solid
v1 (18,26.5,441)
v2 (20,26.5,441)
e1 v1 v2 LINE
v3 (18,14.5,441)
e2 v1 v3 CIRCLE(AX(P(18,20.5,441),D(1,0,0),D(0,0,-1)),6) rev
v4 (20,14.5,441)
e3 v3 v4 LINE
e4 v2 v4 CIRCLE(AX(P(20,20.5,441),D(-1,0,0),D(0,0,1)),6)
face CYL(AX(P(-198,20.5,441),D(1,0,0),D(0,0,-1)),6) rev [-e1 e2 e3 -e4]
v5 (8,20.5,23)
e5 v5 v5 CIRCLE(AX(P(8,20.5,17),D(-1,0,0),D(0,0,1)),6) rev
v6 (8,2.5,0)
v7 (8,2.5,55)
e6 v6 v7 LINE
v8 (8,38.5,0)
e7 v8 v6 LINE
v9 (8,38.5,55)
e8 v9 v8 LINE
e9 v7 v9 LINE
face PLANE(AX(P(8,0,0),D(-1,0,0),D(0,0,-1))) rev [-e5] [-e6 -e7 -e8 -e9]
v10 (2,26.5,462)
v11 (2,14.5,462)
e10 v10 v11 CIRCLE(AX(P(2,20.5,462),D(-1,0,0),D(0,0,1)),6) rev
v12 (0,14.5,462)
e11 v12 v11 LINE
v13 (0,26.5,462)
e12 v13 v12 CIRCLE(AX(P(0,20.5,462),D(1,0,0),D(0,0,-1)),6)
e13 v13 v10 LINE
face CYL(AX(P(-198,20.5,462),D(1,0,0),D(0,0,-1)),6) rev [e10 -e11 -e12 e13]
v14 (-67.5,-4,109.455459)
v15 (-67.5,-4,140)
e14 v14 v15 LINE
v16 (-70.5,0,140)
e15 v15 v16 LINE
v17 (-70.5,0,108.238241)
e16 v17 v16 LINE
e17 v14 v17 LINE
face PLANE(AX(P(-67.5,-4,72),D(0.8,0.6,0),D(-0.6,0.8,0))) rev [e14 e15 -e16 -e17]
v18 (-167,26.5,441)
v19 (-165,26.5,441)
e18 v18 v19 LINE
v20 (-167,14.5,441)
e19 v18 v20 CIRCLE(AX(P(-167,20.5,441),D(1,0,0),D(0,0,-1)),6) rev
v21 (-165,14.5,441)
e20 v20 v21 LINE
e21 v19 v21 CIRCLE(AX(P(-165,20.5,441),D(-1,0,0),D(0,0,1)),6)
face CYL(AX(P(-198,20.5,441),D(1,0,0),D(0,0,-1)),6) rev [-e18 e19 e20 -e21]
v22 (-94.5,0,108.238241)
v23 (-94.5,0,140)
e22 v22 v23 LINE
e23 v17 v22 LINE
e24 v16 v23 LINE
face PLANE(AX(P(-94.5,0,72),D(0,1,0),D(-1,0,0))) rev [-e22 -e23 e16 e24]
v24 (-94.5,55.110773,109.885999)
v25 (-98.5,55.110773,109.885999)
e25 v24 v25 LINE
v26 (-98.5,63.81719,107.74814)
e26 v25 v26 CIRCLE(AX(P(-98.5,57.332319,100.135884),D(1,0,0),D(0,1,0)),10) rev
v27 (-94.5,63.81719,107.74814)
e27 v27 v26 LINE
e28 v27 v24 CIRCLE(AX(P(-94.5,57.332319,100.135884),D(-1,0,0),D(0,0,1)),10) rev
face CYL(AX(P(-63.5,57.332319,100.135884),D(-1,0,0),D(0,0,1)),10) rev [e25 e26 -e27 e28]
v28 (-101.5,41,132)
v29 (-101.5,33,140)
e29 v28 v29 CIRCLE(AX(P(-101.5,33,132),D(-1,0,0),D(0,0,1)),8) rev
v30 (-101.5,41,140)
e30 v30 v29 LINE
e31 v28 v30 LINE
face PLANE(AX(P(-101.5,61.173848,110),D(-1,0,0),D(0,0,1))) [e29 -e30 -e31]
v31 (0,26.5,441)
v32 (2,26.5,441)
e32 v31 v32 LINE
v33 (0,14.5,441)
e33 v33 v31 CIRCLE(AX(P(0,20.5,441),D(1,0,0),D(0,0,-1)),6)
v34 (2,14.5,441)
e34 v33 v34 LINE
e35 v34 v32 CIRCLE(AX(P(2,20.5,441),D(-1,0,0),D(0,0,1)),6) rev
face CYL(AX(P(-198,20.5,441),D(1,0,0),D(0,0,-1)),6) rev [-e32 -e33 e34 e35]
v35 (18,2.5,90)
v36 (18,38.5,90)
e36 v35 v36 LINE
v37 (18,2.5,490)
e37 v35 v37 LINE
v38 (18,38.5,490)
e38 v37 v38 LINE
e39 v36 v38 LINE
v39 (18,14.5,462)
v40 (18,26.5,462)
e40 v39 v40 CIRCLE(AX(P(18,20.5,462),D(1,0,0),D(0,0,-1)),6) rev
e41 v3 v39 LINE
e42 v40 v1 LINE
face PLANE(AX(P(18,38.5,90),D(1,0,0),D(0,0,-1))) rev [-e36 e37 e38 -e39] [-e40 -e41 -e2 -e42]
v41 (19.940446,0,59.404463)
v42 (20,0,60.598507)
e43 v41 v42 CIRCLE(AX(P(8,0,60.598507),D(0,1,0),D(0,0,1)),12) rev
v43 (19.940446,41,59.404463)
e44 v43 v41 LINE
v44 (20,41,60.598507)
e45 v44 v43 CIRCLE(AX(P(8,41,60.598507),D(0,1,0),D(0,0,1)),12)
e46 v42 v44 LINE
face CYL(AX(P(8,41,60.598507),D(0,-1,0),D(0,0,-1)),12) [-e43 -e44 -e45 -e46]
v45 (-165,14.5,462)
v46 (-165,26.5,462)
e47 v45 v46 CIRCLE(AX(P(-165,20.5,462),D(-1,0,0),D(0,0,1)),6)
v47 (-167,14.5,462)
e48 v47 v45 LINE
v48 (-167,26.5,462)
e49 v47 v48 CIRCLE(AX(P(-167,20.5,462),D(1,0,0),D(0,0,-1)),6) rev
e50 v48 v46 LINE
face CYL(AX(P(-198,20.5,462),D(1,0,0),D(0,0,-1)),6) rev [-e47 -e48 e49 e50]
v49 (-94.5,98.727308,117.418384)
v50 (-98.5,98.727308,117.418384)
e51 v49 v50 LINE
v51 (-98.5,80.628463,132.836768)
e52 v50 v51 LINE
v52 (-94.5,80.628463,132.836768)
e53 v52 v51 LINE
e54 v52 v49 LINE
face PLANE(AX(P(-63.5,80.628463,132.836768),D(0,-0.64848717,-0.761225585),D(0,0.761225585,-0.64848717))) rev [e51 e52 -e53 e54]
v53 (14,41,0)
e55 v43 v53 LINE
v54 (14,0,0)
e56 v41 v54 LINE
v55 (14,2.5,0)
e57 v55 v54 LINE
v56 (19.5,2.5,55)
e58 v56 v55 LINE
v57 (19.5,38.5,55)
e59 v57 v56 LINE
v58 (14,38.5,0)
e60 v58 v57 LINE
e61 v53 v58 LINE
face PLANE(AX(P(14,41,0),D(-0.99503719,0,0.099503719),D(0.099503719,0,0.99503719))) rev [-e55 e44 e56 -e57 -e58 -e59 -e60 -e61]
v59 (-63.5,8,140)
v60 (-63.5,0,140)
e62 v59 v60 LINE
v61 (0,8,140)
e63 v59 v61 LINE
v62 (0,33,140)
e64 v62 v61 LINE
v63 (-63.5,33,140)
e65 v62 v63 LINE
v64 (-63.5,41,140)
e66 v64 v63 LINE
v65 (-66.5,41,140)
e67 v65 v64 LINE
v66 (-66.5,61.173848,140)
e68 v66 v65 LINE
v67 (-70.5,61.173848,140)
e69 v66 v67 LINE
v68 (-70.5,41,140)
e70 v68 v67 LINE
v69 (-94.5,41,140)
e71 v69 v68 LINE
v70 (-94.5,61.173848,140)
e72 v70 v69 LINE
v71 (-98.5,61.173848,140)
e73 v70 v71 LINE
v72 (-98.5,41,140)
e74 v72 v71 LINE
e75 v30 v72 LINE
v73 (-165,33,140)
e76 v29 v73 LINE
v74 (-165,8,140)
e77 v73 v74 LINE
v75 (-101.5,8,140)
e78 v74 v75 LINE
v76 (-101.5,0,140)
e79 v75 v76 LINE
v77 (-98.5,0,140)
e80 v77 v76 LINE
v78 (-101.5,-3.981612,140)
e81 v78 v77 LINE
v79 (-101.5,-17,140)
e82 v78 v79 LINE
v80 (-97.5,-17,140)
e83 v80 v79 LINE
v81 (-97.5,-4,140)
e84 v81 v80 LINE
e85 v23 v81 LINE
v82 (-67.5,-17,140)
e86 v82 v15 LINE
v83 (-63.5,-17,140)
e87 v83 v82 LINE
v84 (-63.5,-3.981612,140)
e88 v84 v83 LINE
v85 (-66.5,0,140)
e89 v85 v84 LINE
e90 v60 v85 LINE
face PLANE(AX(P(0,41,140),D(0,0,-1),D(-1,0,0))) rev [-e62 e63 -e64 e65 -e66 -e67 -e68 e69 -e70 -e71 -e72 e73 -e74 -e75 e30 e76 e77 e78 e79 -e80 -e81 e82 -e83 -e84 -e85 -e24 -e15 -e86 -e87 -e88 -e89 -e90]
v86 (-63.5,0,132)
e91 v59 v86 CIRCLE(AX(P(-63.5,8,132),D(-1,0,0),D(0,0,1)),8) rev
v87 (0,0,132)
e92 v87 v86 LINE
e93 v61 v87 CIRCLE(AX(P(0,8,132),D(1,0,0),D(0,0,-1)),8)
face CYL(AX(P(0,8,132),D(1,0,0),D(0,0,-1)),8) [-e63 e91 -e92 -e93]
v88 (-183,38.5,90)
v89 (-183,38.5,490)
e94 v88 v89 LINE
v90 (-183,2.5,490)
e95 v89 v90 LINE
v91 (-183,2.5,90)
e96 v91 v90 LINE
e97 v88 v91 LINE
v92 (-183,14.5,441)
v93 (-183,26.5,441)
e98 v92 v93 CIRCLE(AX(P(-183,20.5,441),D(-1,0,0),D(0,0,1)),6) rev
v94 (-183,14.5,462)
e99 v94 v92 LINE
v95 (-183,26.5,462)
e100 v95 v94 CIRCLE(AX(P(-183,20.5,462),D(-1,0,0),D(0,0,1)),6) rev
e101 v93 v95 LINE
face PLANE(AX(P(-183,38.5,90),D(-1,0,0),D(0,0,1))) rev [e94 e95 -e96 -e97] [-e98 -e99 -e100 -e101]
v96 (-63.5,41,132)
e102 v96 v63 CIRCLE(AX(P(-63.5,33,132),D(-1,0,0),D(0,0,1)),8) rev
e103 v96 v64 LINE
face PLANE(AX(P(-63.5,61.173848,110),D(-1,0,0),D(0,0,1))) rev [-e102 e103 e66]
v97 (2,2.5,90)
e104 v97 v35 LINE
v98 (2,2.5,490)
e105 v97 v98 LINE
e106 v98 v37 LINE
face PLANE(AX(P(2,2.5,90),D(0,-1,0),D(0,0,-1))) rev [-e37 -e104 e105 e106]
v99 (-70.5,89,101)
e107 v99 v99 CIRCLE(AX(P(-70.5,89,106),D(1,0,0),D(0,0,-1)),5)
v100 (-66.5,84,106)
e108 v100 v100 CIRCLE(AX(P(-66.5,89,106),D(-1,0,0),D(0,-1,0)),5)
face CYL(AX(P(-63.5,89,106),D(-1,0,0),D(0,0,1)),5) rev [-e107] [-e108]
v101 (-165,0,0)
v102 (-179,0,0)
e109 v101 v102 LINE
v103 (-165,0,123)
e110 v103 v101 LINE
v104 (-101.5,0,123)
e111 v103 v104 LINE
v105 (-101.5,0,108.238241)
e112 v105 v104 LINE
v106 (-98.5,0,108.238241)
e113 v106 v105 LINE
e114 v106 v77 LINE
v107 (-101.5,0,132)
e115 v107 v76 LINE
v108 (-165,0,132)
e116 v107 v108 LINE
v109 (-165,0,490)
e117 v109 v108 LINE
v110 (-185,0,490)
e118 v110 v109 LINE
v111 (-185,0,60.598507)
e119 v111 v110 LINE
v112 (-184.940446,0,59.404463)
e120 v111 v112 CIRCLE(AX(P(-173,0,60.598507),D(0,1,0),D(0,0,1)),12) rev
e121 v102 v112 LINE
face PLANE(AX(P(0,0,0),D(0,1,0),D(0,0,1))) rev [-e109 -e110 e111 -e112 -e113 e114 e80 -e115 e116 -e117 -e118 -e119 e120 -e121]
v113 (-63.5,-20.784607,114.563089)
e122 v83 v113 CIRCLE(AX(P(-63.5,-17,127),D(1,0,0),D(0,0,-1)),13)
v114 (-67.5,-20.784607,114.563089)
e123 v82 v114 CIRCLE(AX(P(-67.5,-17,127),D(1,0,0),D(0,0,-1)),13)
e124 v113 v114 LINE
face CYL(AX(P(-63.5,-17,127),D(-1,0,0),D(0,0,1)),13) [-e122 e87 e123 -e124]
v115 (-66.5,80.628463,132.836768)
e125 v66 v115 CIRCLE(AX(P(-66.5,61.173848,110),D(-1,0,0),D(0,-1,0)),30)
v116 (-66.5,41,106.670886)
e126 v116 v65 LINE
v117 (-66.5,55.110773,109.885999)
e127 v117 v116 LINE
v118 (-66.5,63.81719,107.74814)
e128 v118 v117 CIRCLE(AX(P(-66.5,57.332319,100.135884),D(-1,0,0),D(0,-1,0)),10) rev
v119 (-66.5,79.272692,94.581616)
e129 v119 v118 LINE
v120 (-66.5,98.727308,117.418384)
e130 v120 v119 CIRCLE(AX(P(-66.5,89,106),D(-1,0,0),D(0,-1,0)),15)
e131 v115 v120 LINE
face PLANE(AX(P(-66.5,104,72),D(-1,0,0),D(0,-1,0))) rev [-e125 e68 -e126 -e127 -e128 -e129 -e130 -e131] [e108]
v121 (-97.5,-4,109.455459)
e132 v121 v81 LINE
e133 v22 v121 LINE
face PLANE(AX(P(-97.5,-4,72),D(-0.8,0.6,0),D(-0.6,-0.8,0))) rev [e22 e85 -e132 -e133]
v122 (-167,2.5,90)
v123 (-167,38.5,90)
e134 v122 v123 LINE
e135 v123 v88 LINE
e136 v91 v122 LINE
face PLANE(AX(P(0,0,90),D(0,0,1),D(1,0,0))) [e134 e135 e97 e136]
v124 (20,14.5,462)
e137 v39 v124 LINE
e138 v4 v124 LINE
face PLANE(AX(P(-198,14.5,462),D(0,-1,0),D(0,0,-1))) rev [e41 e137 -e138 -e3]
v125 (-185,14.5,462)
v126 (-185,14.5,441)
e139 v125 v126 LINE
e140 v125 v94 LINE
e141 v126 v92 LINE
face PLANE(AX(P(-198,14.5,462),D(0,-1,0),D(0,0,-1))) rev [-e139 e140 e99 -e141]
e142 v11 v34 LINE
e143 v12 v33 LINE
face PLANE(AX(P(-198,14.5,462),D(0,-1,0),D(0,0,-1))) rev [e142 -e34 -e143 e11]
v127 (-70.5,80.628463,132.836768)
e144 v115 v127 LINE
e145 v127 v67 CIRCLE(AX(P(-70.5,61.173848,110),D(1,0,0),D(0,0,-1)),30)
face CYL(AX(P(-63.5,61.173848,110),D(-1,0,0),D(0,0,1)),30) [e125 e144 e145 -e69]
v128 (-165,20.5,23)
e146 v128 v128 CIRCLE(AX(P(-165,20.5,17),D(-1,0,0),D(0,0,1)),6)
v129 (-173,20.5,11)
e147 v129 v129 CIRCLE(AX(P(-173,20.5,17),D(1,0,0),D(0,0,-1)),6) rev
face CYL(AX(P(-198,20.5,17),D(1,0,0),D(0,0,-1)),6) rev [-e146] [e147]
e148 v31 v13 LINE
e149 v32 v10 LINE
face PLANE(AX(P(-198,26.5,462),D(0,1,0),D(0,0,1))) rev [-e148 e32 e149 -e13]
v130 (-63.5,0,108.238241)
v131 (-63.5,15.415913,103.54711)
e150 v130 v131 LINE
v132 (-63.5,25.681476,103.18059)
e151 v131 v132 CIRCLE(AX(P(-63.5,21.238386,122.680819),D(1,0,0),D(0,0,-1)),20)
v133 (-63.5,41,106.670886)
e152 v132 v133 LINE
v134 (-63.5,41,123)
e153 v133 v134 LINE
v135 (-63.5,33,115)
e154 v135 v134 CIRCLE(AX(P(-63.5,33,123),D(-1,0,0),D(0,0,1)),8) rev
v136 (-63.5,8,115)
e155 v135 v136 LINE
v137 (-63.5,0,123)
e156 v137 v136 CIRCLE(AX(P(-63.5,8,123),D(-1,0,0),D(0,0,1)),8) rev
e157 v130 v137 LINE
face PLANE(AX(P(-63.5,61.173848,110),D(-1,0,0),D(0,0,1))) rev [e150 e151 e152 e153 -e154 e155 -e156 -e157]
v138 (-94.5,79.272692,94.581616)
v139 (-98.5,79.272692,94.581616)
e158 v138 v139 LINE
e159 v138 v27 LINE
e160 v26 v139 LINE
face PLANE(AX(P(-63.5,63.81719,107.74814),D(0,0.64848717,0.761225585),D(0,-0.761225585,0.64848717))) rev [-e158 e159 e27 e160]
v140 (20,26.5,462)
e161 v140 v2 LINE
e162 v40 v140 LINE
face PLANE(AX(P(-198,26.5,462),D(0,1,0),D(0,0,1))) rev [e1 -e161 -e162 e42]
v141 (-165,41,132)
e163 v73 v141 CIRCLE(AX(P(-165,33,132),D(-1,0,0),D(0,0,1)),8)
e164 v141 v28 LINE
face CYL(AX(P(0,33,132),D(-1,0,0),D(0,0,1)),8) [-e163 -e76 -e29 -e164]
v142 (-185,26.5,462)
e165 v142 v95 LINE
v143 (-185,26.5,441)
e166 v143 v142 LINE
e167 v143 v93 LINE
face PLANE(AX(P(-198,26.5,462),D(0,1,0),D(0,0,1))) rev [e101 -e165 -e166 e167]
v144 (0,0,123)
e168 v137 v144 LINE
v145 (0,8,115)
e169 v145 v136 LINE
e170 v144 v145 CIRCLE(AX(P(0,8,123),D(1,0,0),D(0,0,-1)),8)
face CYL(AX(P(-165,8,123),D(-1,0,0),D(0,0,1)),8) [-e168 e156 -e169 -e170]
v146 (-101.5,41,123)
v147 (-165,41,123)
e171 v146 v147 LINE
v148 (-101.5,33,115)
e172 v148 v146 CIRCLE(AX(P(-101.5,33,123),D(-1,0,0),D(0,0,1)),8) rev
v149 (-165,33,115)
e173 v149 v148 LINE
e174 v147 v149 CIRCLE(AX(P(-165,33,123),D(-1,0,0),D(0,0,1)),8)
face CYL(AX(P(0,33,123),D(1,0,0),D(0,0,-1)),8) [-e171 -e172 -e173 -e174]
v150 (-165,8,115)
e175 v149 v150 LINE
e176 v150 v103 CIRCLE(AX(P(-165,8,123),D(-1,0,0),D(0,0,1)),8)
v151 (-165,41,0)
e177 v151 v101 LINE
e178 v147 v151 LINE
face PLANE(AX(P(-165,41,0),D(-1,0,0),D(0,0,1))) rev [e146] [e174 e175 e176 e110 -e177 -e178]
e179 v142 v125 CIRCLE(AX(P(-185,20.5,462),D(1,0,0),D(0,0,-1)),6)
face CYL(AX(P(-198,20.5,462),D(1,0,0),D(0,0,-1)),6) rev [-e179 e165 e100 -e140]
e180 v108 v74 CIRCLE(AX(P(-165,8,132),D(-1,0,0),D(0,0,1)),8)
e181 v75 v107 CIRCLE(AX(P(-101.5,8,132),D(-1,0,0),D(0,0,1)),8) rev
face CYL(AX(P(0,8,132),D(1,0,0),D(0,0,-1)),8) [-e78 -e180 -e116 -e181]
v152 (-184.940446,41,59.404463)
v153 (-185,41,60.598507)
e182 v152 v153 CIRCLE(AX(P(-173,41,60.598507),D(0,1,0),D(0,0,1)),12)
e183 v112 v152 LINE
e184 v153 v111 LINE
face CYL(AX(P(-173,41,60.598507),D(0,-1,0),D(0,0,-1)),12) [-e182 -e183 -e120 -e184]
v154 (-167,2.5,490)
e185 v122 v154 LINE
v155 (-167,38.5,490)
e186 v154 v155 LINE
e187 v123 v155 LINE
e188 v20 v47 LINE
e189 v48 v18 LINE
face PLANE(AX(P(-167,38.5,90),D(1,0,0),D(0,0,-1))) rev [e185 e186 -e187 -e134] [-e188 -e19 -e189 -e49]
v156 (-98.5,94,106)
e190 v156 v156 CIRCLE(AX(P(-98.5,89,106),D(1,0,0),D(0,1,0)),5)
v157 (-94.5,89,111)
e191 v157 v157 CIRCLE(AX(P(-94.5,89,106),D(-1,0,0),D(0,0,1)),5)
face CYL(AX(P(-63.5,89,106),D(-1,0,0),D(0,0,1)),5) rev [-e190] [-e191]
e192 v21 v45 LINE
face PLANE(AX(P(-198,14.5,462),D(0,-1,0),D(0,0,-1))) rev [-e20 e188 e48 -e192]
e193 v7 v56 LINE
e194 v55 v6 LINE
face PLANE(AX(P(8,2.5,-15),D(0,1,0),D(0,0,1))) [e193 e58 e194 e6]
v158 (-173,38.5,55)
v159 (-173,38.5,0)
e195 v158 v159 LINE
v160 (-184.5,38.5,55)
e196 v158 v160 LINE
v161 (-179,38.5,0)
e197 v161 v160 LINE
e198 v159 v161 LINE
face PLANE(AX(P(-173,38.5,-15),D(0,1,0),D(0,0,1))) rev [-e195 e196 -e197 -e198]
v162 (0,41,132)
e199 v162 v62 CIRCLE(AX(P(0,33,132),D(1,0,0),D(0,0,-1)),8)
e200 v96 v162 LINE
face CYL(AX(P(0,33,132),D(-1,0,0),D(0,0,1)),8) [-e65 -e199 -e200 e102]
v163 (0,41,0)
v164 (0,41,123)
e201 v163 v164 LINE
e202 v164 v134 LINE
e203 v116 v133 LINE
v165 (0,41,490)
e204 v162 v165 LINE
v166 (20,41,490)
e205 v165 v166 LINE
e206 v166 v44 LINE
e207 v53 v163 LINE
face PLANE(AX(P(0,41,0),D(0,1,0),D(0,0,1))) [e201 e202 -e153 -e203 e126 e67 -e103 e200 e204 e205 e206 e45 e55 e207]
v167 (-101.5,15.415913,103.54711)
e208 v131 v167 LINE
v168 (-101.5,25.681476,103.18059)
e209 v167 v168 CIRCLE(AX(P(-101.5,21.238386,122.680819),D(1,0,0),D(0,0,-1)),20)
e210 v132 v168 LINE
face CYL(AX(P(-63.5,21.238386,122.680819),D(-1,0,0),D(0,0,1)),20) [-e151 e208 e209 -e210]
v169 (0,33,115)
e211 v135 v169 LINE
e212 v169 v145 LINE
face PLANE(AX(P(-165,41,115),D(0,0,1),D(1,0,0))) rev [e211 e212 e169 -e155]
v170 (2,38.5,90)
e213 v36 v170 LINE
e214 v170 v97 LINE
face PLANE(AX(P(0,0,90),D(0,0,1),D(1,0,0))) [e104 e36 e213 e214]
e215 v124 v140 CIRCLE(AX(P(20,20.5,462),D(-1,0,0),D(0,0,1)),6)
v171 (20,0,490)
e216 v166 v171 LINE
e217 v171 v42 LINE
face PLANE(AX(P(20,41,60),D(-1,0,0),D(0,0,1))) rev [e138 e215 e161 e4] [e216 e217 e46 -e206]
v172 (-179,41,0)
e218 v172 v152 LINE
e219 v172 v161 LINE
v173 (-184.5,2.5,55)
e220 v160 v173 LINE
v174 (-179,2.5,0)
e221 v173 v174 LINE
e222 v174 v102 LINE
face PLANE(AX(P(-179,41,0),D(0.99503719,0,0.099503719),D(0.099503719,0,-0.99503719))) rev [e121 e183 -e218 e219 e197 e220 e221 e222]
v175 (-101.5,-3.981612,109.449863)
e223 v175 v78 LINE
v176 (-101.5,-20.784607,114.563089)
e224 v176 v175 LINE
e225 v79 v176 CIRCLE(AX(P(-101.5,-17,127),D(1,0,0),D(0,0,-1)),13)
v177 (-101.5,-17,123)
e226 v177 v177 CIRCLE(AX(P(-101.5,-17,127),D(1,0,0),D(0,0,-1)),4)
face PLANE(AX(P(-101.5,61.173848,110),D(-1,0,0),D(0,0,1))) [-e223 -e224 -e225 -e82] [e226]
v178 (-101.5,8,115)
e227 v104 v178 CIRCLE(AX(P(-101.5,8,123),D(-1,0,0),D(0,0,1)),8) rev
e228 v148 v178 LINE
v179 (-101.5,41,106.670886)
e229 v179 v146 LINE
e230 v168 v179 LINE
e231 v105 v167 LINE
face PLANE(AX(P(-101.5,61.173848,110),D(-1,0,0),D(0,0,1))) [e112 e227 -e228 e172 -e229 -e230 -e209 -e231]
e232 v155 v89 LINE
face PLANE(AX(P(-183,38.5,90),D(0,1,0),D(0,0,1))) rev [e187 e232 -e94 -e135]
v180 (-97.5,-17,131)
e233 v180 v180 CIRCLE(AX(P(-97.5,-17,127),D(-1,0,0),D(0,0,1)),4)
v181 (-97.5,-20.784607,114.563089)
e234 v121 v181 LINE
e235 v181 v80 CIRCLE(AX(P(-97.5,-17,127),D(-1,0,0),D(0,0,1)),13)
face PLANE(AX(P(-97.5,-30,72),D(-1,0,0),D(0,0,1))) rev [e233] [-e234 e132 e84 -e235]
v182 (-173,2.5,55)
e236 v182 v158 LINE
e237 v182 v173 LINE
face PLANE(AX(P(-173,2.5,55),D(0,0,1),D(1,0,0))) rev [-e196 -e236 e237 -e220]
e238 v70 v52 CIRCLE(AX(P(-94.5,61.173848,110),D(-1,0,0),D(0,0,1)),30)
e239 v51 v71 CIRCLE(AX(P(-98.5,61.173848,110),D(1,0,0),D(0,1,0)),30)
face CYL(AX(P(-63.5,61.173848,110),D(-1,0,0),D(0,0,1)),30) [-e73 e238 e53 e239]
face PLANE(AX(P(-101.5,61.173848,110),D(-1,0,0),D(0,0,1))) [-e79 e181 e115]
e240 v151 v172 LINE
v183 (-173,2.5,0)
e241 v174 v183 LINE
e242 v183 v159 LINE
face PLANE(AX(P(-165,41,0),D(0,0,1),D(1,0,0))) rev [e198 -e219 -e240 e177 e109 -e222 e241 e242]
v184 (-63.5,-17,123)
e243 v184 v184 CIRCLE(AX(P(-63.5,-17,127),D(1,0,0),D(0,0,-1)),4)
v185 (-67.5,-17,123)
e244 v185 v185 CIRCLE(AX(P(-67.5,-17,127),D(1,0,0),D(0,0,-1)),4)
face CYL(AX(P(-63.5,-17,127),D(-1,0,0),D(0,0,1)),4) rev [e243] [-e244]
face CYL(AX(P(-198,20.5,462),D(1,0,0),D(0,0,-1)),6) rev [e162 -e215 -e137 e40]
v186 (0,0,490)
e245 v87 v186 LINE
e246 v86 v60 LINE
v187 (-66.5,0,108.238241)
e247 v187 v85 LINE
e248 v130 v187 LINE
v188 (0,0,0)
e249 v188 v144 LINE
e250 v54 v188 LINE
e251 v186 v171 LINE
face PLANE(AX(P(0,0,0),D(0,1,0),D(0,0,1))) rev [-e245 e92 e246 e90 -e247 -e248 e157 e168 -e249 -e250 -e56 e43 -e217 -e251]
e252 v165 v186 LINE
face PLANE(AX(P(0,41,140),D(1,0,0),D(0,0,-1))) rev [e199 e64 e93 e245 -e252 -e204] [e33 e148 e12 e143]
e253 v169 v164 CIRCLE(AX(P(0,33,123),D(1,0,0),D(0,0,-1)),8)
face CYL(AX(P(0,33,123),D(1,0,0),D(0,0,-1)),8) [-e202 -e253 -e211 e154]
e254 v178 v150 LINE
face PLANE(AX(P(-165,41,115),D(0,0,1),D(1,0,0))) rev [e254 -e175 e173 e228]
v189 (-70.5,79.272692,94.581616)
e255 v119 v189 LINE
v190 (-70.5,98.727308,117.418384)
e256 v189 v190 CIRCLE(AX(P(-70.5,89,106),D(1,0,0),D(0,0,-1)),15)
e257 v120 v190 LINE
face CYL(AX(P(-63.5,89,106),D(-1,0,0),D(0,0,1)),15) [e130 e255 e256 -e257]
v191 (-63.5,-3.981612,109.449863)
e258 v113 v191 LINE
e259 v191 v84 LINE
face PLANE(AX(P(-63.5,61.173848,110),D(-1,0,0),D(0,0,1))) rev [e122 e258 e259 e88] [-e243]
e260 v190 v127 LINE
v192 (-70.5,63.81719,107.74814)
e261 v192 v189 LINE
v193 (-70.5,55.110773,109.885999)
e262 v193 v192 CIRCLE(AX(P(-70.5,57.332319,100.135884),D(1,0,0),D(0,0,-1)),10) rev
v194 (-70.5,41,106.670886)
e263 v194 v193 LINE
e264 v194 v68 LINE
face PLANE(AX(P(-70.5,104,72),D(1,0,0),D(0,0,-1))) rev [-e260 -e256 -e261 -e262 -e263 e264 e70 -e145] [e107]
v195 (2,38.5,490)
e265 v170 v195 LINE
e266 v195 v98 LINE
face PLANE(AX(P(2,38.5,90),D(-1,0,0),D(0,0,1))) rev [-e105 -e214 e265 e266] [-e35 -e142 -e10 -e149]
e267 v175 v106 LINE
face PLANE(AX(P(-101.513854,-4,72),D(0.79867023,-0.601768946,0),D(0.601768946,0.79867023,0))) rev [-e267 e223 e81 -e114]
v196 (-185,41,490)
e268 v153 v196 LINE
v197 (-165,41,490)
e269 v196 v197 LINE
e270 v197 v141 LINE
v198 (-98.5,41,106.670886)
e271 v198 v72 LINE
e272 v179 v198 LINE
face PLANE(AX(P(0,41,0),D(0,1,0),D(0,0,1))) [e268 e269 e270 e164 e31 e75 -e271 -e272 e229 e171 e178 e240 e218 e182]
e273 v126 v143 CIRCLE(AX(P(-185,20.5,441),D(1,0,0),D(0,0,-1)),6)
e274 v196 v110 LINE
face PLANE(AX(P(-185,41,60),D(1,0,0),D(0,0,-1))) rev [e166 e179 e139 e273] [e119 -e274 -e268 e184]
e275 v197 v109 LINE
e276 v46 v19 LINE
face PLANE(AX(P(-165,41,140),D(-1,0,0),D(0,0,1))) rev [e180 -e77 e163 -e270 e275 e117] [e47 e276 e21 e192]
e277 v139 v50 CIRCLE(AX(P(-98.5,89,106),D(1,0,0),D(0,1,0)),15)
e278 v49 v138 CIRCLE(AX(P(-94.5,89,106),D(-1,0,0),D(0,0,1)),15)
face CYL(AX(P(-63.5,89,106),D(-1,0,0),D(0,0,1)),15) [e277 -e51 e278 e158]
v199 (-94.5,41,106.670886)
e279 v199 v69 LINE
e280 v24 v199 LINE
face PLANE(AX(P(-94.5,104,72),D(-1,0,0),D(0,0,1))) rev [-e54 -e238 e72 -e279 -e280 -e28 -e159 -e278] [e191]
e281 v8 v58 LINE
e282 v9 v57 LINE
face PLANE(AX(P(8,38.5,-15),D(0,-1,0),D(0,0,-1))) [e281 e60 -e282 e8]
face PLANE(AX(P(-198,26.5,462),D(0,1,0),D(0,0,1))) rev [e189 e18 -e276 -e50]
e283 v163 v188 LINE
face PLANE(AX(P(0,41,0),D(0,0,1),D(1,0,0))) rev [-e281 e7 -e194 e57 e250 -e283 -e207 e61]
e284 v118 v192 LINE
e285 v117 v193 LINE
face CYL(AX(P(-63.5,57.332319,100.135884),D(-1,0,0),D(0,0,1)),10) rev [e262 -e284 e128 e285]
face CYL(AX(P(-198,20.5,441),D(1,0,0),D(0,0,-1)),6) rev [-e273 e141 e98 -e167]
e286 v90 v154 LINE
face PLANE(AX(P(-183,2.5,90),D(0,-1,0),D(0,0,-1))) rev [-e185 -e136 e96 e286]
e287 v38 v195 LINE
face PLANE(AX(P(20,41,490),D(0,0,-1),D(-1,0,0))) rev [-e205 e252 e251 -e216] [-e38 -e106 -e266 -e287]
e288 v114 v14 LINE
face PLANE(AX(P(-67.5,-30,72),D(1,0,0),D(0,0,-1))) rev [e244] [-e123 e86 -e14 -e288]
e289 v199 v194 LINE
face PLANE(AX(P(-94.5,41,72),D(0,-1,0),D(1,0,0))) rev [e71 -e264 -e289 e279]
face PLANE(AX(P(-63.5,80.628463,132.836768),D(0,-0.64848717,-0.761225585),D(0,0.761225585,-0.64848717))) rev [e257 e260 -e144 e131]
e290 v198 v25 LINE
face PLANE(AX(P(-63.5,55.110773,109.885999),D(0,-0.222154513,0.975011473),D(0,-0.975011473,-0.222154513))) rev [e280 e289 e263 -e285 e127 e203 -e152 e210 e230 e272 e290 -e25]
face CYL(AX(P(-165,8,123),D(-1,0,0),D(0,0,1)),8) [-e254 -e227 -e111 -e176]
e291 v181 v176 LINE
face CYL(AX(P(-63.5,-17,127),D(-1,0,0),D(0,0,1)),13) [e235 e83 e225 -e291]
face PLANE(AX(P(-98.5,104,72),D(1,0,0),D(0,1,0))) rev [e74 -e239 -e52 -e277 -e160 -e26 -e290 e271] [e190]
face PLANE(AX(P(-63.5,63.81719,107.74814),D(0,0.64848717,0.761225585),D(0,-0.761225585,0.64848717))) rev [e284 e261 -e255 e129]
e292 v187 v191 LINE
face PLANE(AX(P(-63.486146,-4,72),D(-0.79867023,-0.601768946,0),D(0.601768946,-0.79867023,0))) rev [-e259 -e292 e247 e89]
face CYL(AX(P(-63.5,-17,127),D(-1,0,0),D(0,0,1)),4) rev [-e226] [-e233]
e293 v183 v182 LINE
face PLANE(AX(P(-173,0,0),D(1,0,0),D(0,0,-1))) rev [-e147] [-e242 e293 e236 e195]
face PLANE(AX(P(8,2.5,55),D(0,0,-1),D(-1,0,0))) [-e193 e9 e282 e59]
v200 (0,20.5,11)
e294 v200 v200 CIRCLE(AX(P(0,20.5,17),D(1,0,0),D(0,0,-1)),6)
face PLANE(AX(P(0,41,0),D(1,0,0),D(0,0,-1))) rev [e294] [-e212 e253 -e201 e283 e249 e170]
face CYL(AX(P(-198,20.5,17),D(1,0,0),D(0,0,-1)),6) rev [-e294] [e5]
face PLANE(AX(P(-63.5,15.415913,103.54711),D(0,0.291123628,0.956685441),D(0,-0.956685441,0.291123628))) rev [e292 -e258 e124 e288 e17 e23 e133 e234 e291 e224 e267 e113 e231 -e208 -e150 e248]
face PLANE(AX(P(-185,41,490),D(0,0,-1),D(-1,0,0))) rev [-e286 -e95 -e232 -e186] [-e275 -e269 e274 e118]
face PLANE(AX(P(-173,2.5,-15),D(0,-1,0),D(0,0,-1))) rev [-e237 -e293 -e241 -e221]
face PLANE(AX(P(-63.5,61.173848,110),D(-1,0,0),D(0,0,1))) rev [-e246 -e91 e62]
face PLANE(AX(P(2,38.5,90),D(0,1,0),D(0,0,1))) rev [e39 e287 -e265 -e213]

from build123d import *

# Parameters (mm, degrees)
EXTRUDE_1_DEPTH     = 41
FILLET_4_R          = 8
SKETCH_2_R          = 6
CUT_EXTRUDE_1_DEPTH = 115.5
SKETCH_3_W          = 16
SKETCH_3_H          = 36
CUT_EXTRUDE_2_DEPTH = 400
SKETCH_4_W          = 70
SKETCH_4_H          = 36
CUT_EXTRUDE_3_DEPTH = 12
FILLET_5_R          = 12
FILLET_6_R          = 12
SKETCH_5_R          = 4
SKETCH_5_R_2        = 5
EXTRUDE_2_DEPTH     = 19
SKETCH_6_W          = 3
SKETCH_6_H          = 63
SKETCH_6_W_2        = 24
CUT_EXTRUDE_4_DEPTH = 68


with BuildPart() as part:
    # Эскиз1 → Бобышка-Вытянуть1 (new body)
    with BuildSketch(Plane(origin=(0, 0, 0), x_dir=(1, 0, 0), z_dir=(0, 1, 0))):
        Polygon((0, 0), (14, 0), (20, -60), (20, -490), (0, -490), (0, -140), (-165, -140), (-165, -490), (-185, -490), (-185, -60), (-179, 0), (-165, 0), (-165, -115), (0, -115), align=None)
    extrude(amount=EXTRUDE_1_DEPTH)

    # Скругление4
    fillet_4_edges = [part.edges().sort_by_distance(p)[0] for p in [
        (-82.5, 0, 140),
        (-82.5, 0, 115),
        (-82.5, 41, 140),
        (-82.5, 41, 115),
    ]]
    fillet(fillet_4_edges, radius=FILLET_4_R)

    # Эскиз2 → Вырез-Вытянуть1 (cut, symmetric)
    with BuildSketch(Plane(origin=(-82.5, 0, 0), x_dir=(0, 0, -1), z_dir=(1, 0, 0))):
        with Locations((-17, 20.5)):
            Circle(SKETCH_2_R)
        with BuildLine():
            Line((-462, 26.5), (-441, 26.5))
            ThreePointArc((-441, 26.5), (-435, 20.5), (-441, 14.5))
            Line((-441, 14.5), (-462, 14.5))
            ThreePointArc((-462, 14.5), (-468, 20.5), (-462, 26.5))
        make_face()
    extrude(amount=CUT_EXTRUDE_1_DEPTH, both=True, mode=Mode.SUBTRACT)

    # Эскиз3 → Вырез-Вытянуть2 (cut)
    with BuildSketch(Plane.XY.offset(490)):
        with Locations((10, 20.5)):
            Rectangle(SKETCH_3_W, SKETCH_3_H)
        with Locations((-175, 20.5)):
            Rectangle(SKETCH_3_W, SKETCH_3_H)
    extrude(amount=-CUT_EXTRUDE_2_DEPTH, mode=Mode.SUBTRACT)

    # Эскиз4 → Вырез-Вытянуть3 (cut)
    with BuildSketch(Plane.ZY.offset(185)):
        with Locations((20, 20.5)):
            Rectangle(SKETCH_4_W, SKETCH_4_H)
    cut_extrude_3 = extrude(amount=-CUT_EXTRUDE_3_DEPTH, mode=Mode.SUBTRACT)

    # Зеркальное отражение1: Вырез-Вытянуть3 across plane
    add(cut_extrude_3.mirror(Plane(origin=(-82.5, 0, 0), x_dir=(0, 0, 1), z_dir=(1, 0, 0))), mode=Mode.SUBTRACT)

    # Скругление5
    # the kernel refuses this fillet: 12 mm, written as the material it takes off along each edge
    with BuildSketch(Plane(origin=(20, -1.496268634, 60), x_dir=(-0.0995037190210001, 0, -0.995037190209989), z_dir=(0, 1, 0))) as fillet_5_piece_1:
        with BuildLine():
            CenterArc((FILLET_5_R * 0.0498756211209, FILLET_5_R), FILLET_5_R, 264.289406863, 5.710593137)
            Line((-FILLET_5_R * 0.0496280979001, FILLET_5_R * 0.00496280979001), (0, 0))
            Line((0, 0), (FILLET_5_R * 0.0498756211209, 0))
        make_face()
    extrude(amount=43.992537267, mode=Mode.SUBTRACT)

    # Скругление6
    # the kernel refuses this fillet: 12 mm, written as the material it takes off along each edge
    with BuildSketch(Plane(origin=(-185, -1.496268634, 60), x_dir=(0.09950371902099304, 0, -0.9950371902099898), z_dir=(0, 1, 0))) as fillet_6_piece_1:
        with BuildLine():
            CenterArc((FILLET_6_R * 0.0498756211209, -FILLET_6_R), FILLET_6_R, 90, 5.710593137)
            Line((-FILLET_6_R * 0.0496280979001, -FILLET_6_R * 0.00496280979001), (0, 0))
            Line((0, 0), (FILLET_6_R * 0.0498756211209, 0))
        make_face()
    extrude(amount=43.992537267, mode=Mode.SUBTRACT)

    # Эскиз5 → Бобышка-Вытянуть2 (add, symmetric)
    with BuildSketch(Plane(origin=(-82.5, 0, 0), x_dir=(0, 0, -1), z_dir=(1, 0, 0))):
        with BuildLine():
            Line((-140, 61.173848335), (-140, -17))
            ThreePointArc((-140, -17), (-128.913133611, -29.858457131), (-114.563089264, -20.784607158))
            Line((-114.563089264, -20.784607158), (-103.54711014, 15.415913355))
            ThreePointArc((-103.54711014, 15.415913355), (-102.693554475, 20.5247626), (-103.180589505, 25.681476162))
            Line((-103.180589505, 25.681476162), (-109.885999017, 55.110773465))
            ThreePointArc((-109.885999017, 55.110773465), (-109.847393001, 59.716977585), (-107.748140134, 63.81719029))
            Line((-107.748140134, 63.81719029), (-94.581616231, 79.272692454))
            ThreePointArc((-94.581616231, 79.272692454), (-96.272692454, 100.418383769), (-117.418383769, 98.727307546))
            Line((-117.418383769, 98.727307546), (-132.836767538, 80.628463428))
            ThreePointArc((-132.836767538, 80.628463428), (-138.152291436, 71.539584533), (-140, 61.173848335))
        make_face()
        with Locations((-127, -17)):
            Circle(SKETCH_5_R, mode=Mode.SUBTRACT)
        with Locations((-106, 89)):
            Circle(SKETCH_5_R_2, mode=Mode.SUBTRACT)
    extrude(amount=EXTRUDE_2_DEPTH, both=True)

    # Эскиз6 → Вырез-Вытянуть4 (cut)
    with BuildSketch(Plane.XY.offset(140)):
        with Locations((-100, 72.5)):
            Rectangle(SKETCH_6_W, SKETCH_6_H)
        Polygon((-101.513854398, -4), (-98.5, 0), (-101.5, 0), align=None)
        Polygon((-94.5, 0), (-70.5, 0), (-67.5, -4), (-67.5, -30), (-97.5, -30), (-97.5, -4), align=None)
        with Locations((-82.5, 72.5)):
            Rectangle(SKETCH_6_W_2, SKETCH_6_H)
        Polygon((-63.486145602, -4), (-63.5, 0), (-66.5, 0), align=None)
        with Locations((-65, 72.5)):
            Rectangle(SKETCH_6_W, SKETCH_6_H)
    extrude(amount=-CUT_EXTRUDE_4_DEPTH, mode=Mode.SUBTRACT)


solid = part.part
